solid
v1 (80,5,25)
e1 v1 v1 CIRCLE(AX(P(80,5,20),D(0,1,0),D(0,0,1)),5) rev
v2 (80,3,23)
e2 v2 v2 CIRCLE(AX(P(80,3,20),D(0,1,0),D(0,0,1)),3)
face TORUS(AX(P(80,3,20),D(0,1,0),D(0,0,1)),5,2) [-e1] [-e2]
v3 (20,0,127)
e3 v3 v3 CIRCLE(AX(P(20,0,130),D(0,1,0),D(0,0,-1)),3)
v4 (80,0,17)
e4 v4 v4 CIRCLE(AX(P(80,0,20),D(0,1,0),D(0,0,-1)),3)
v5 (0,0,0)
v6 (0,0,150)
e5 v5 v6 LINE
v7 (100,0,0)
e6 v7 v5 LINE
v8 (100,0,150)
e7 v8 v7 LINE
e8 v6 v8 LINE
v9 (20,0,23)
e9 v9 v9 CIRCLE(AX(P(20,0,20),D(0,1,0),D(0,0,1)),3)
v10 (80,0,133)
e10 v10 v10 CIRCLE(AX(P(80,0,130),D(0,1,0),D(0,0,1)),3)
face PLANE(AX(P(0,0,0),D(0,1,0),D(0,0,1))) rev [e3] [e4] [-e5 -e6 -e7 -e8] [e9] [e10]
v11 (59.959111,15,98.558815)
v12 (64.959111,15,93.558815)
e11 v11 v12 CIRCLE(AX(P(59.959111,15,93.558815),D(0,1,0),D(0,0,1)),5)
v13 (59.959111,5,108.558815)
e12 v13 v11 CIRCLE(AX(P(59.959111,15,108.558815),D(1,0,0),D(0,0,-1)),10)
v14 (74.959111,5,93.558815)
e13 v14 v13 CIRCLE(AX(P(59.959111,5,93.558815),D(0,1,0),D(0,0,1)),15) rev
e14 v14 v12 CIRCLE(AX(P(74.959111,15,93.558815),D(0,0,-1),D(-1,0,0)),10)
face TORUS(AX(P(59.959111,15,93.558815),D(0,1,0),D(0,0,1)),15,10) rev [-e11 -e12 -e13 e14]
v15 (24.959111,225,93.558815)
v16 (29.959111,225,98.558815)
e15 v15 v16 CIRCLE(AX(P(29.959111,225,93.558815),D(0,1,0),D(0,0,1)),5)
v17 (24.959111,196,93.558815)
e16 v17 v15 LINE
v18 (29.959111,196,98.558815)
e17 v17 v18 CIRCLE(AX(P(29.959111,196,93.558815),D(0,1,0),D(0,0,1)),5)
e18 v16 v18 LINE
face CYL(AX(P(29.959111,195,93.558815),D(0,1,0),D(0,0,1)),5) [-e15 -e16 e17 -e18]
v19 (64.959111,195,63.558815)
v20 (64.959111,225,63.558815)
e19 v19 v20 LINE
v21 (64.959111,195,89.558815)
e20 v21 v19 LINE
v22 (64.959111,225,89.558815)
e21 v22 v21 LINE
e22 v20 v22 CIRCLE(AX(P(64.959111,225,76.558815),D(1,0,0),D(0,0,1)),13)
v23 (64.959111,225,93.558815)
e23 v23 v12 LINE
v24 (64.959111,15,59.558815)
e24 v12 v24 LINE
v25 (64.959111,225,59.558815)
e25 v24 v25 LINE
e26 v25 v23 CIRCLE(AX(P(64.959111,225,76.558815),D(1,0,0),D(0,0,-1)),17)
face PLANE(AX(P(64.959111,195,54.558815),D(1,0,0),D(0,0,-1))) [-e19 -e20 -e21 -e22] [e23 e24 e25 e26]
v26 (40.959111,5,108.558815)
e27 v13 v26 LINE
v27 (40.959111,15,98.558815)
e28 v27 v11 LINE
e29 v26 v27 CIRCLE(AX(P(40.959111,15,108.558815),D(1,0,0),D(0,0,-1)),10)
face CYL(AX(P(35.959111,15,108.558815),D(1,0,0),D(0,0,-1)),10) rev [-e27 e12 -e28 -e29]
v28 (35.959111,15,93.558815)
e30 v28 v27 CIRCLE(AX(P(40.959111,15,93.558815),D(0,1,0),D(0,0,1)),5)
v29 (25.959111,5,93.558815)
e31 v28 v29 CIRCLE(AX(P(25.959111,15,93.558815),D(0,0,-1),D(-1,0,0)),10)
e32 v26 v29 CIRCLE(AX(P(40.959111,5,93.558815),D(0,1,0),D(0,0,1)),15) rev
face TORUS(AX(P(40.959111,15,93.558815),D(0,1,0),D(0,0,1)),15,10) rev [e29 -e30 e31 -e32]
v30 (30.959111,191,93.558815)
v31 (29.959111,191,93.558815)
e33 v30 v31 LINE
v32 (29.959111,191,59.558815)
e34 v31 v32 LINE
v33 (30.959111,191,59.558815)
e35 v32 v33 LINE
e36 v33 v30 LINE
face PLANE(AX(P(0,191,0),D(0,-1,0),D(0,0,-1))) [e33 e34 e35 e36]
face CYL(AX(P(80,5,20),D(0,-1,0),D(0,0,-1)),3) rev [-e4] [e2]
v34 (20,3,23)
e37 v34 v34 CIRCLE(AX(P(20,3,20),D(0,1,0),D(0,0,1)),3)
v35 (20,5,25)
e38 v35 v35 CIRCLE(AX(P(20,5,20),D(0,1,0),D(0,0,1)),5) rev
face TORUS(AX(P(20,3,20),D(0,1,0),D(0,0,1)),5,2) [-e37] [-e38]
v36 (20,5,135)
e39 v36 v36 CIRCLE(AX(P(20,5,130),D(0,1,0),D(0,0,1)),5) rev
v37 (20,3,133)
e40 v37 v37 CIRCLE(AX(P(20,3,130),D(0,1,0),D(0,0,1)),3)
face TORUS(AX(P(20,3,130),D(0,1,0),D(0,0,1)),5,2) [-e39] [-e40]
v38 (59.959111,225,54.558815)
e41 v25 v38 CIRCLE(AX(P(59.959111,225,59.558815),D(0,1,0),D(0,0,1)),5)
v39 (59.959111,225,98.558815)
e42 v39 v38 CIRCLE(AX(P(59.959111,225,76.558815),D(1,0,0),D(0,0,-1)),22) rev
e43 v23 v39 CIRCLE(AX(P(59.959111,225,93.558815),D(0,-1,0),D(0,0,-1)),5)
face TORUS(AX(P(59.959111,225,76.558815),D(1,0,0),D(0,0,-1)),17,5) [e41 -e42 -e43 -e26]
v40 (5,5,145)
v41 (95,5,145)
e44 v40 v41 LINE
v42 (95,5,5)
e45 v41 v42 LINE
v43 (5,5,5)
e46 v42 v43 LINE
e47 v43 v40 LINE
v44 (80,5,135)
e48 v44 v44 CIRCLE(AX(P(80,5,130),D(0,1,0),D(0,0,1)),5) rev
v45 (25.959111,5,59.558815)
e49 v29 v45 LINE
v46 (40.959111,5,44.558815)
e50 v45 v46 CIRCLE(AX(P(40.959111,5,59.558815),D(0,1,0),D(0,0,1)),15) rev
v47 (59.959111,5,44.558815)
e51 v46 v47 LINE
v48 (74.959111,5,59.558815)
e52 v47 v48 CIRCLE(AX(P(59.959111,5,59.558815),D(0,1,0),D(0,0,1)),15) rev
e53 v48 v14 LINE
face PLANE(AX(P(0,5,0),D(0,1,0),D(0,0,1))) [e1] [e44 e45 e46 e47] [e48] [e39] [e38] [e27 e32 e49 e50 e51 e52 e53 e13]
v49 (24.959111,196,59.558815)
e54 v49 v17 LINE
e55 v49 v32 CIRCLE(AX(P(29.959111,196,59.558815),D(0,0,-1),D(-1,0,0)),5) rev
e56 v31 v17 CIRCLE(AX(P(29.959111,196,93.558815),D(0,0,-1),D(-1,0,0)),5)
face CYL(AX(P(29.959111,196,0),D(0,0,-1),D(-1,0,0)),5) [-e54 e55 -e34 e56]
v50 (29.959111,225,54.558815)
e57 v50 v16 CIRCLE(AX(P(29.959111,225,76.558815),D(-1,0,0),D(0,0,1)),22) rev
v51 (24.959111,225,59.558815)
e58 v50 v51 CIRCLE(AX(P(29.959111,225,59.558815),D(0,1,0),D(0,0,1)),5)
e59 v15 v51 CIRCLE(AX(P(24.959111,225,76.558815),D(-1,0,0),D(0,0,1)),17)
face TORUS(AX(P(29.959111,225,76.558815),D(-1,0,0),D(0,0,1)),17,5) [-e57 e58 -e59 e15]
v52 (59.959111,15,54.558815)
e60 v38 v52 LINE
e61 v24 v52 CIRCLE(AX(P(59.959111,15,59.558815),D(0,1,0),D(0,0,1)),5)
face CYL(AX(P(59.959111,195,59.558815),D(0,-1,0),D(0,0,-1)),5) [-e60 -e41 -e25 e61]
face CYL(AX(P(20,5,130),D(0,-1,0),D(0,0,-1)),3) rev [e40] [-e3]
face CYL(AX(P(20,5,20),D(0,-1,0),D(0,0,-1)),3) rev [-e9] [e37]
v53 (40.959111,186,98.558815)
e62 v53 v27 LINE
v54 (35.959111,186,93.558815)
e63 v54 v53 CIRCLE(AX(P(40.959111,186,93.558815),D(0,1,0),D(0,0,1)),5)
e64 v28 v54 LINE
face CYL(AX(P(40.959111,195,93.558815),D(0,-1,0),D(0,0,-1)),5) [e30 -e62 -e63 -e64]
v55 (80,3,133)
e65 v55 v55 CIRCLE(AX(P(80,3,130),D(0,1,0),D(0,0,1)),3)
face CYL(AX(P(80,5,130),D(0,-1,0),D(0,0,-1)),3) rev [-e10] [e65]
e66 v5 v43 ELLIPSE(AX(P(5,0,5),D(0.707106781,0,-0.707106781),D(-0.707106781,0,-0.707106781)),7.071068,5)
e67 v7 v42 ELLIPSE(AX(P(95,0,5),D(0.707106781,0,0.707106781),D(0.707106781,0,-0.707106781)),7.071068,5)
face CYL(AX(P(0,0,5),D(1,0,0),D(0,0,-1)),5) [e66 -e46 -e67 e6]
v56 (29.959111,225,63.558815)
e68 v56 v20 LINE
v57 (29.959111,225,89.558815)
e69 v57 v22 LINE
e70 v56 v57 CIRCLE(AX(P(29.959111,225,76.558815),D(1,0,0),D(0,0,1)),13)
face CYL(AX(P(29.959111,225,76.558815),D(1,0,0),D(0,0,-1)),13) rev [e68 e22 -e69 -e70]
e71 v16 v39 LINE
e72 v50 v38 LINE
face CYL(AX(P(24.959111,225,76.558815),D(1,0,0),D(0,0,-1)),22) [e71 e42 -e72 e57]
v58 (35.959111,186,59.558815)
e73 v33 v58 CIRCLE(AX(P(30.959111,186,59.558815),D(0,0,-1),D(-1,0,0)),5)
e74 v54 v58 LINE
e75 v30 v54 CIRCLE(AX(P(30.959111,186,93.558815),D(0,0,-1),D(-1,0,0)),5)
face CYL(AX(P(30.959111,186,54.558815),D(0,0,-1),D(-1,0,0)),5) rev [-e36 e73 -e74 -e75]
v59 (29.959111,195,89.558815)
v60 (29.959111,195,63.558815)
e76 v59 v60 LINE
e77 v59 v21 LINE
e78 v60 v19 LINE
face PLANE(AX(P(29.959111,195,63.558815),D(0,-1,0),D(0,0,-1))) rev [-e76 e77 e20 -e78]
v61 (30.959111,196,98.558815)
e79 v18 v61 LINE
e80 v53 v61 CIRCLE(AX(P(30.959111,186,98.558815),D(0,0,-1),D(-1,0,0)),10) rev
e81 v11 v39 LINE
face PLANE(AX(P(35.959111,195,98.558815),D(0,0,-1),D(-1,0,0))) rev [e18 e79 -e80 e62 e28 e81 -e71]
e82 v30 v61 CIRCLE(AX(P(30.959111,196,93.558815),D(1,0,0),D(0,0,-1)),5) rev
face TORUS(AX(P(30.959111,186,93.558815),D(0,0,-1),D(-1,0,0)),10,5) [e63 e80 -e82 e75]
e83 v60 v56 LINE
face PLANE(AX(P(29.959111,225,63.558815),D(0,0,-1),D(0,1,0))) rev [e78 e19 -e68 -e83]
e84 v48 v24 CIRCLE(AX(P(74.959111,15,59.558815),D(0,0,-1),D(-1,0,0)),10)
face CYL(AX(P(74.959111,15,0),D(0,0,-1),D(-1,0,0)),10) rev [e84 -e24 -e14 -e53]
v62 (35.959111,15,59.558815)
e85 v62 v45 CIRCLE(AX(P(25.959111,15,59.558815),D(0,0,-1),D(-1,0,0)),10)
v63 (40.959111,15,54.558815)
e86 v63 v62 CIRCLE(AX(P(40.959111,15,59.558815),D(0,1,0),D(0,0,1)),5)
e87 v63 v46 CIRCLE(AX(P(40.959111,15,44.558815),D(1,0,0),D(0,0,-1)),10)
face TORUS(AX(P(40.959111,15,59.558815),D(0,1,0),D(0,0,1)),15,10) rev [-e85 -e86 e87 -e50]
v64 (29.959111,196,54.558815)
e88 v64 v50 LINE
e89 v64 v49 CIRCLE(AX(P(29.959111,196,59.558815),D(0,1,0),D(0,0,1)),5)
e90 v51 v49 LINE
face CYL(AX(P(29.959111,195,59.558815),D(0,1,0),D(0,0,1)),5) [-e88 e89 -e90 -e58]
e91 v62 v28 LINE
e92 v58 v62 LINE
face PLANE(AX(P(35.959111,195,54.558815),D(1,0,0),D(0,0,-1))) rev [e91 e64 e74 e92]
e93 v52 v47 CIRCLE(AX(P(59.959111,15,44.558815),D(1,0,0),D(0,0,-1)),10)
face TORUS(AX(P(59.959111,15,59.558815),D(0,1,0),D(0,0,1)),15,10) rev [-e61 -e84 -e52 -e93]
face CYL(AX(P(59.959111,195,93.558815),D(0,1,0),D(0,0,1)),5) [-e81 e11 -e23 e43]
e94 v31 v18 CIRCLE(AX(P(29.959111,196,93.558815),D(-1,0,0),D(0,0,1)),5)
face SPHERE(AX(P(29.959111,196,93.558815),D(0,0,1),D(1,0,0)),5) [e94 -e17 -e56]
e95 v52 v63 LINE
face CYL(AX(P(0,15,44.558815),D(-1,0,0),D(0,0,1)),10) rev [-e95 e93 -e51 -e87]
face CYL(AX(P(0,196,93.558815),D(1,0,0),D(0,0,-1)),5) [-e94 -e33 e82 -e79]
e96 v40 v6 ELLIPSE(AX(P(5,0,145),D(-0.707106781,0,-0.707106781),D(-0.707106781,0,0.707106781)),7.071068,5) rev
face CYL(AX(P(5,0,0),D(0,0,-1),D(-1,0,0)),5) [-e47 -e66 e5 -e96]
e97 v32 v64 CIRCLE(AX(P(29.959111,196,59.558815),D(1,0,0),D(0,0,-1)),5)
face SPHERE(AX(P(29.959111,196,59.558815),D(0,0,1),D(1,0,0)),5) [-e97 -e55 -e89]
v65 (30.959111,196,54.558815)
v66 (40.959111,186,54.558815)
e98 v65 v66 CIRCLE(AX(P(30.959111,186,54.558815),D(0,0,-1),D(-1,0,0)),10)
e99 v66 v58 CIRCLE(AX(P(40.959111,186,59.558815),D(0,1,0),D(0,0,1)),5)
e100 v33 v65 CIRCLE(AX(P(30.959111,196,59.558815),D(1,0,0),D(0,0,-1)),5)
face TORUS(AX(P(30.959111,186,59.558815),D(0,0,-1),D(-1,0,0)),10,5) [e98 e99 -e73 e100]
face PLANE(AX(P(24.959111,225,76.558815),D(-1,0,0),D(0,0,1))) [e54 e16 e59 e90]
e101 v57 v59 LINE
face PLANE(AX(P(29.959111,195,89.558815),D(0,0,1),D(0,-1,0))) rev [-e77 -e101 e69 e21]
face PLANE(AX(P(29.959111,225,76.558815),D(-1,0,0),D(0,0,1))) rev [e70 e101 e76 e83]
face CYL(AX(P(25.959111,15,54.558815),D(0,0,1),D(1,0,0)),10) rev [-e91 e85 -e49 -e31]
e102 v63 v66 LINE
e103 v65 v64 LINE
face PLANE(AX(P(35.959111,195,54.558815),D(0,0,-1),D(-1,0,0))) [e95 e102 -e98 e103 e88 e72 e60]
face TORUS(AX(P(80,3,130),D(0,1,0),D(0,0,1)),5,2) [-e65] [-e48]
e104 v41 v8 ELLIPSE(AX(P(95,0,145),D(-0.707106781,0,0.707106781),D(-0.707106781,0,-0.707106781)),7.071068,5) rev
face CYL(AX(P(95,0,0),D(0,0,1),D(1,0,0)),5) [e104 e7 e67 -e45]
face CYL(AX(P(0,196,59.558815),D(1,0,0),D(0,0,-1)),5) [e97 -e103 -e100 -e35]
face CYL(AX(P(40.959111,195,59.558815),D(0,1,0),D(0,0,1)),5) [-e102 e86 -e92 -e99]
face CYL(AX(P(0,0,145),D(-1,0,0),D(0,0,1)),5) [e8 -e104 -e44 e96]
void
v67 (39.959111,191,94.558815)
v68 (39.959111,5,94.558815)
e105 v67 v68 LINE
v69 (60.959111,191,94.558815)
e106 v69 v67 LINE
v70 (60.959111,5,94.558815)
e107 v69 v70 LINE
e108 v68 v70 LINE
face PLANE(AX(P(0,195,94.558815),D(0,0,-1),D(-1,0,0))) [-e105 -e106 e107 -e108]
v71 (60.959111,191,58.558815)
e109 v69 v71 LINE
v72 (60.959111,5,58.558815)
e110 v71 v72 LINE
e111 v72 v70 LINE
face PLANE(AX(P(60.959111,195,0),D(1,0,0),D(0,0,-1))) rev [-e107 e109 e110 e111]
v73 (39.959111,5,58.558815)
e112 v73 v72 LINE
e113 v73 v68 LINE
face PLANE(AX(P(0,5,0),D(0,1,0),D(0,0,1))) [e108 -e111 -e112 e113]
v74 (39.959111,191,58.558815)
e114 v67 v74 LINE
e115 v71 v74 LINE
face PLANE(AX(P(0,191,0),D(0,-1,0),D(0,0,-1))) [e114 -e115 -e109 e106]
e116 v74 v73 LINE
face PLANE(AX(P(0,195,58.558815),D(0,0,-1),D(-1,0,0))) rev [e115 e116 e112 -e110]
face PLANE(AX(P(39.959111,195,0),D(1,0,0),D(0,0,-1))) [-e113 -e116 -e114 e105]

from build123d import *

# Parameters (mm, degrees)
SKETCH1_W           = 100
SKETCH1_H           = 150
SKETCH1_R           = 3
BOTTOM_DEPTH        = 5
SKETCH2_W           = 29
SKETCH2_H           = 44
SKETCH2_W_2         = 21
SKETCH2_H_2         = 36
BOSS_EXTRUDE2_DEPTH = 190
BOSS_EXTRUDE3_DEPTH = 40
CUT_EXTRUDE1_DEPTH  = 35
SKETCH5_W           = 40
SKETCH5_H           = 44
BOSS_EXTRUDE4_DEPTH = 4
FILLET1_R           = 5
FILLET3_R           = 5
FILLET4_R           = 5
FILLET5_R           = 10
FILLET6_R           = 5
FILLET7_R           = 2


# Some blends are built 0.0001 mm under size
with BuildPart() as part:
    # Sketch1 → bottom (new body)
    with BuildSketch(Plane(origin=(0, 0, 0), x_dir=(1, 0, 0), z_dir=(0, 1, 0))):
        with Locations((50, -75)):
            Rectangle(SKETCH1_W, SKETCH1_H)
        with Locations(Location((20, -20, 0), (0, 0, 270))):
            Circle(SKETCH1_R, mode=Mode.SUBTRACT)
        with Locations(Location((80, -20, 0), (0, 0, 90))):
            Circle(SKETCH1_R, mode=Mode.SUBTRACT)
        with Locations(Location((80, -130, 0), (0, 0, 270))):
            Circle(SKETCH1_R, mode=Mode.SUBTRACT)
        with Locations(Location((20, -130, 0), (0, 0, 90))):
            Circle(SKETCH1_R, mode=Mode.SUBTRACT)
    extrude(amount=BOTTOM_DEPTH)

    # Sketch2 → Boss-Extrude2 (add)
    with BuildSketch(Plane(origin=(0, 5, 0), x_dir=(1, 0, 0), z_dir=(0, 1, 0))):
        with Locations((50.459110832, -76.558815358)):
            Rectangle(SKETCH2_W, SKETCH2_H)
        with Locations((50.459110832, -76.558815358)):
            Rectangle(SKETCH2_W_2, SKETCH2_H_2, mode=Mode.SUBTRACT)
    extrude(amount=BOSS_EXTRUDE2_DEPTH)

    # Sketch3 → Boss-Extrude3 (add)
    with BuildSketch(Plane(origin=(64.959110832, 0, 0), x_dir=(0, 0, -1), z_dir=(1, 0, 0))):
        with BuildLine():
            Line((-98.558815358, 195), (-98.558815358, 225))
            ThreePointArc((-98.558815358, 225), (-76.558815358, 247), (-54.558815358, 225))
            Line((-54.558815358, 225), (-54.558815358, 195))
            Line((-54.558815358, 195), (-98.558815358, 195))
        make_face()
    extrude(amount=-BOSS_EXTRUDE3_DEPTH)

    # Sketch4 → Cut-Extrude1 (cut)
    with BuildSketch(Plane(origin=(64.959110832, 0, 0), x_dir=(0, 0, -1), z_dir=(1, 0, 0))):
        with BuildLine():
            Line((-89.558815358, 195), (-89.558815358, 225))
            ThreePointArc((-89.558815358, 225), (-76.558815358, 238), (-63.558815358, 225))
            Line((-63.558815358, 225), (-63.558815358, 195))
            Line((-63.558815358, 195), (-89.558815358, 195))
        make_face()
    extrude(amount=-CUT_EXTRUDE1_DEPTH, mode=Mode.SUBTRACT)

    # Sketch5 → Boss-Extrude4 (add)
    with BuildSketch(Plane.XZ.offset(-195)):
        with Locations((44.959110832, 76.558815358)):
            Rectangle(SKETCH5_W, SKETCH5_H)
    extrude(amount=BOSS_EXTRUDE4_DEPTH)

    # Fillet1
    fillet1_edges = [part.edges().sort_by_distance(p)[0] for p in [
        (24.959110832, 191, 76.558815358),
        (24.959110832, 208, 98.558815358),
        (24.959110832, 247, 76.558815358),
        (24.959110832, 208, 54.558815358),
    ]]
    fillet(fillet1_edges, radius=FILLET1_R)

    # Fillet3
    # the kernel refuses this fillet: 5 mm, written as the material it adds along each edge
    with BuildSketch(Plane(origin=(35.959110832, 191, 54.558815358), x_dir=(-1, 0, 0), z_dir=(0, 0, 1))) as fillet3_piece_1:
        with BuildLine():
            CenterArc((FILLET3_R, FILLET3_R), FILLET3_R, 180, 90)
            Line((0, FILLET3_R), (0, 0))
            Line((0, 0), (FILLET3_R, 0))
        make_face()
    extrude(amount=44)
    # the kernel refuses this fillet: 5 mm, written as the material it takes off along each edge
    with BuildSketch(Plane(origin=(29.959110832, 196, 59.558815358), x_dir=(0, 0, -1), z_dir=(0, -1, 0))) as fillet3_2_piece_1_section:
        Polygon((0, 0), (FILLET3_R * 1.02, 0), (FILLET3_R * 1.02, -FILLET3_R * 1.02), (0, -FILLET3_R * 1.02), align=None)
    fillet3_2_piece_1 = extrude(amount=FILLET3_R * 1.02, mode=Mode.PRIVATE)
    fillet3_2_piece_1 = fillet3_2_piece_1 - Plane(origin=(29.959110832, 196, 59.558815358), x_dir=(0.7071067811865475, 0, 0.7071067811865475), z_dir=(0, -1, 0)) * Sphere(FILLET3_R, mode=Mode.PRIVATE)
    add(fillet3_2_piece_1, mode=Mode.SUBTRACT)
    with BuildSketch(Plane(origin=(29.959110832, 196, 93.558815358), x_dir=(0, 0, 1), z_dir=(0, -1, 0))) as fillet3_2_piece_2_section:
        Polygon((0, 0), (FILLET3_R * 1.02, 0), (FILLET3_R * 1.02, FILLET3_R * 1.02), (0, FILLET3_R * 1.02), align=None)
    fillet3_2_piece_2 = extrude(amount=FILLET3_R * 1.02, mode=Mode.PRIVATE)
    fillet3_2_piece_2 = fillet3_2_piece_2 - Plane(origin=(29.959110832, 196, 93.558815358), x_dir=(0.7071067811865475, 0, -0.7071067811865475), z_dir=(0, -1, 0)) * Sphere(FILLET3_R, mode=Mode.PRIVATE)
    add(fillet3_2_piece_2, mode=Mode.SUBTRACT)
    with BuildSketch(Plane(origin=(35.959110832, 5, 98.558815358), x_dir=(1, 0, 0), z_dir=(0, 1, 0))) as fillet3_2_piece_3:
        with BuildLine():
            CenterArc((FILLET3_R, FILLET3_R), FILLET3_R, 180, 90)
            Line((0, FILLET3_R), (0, 0))
            Line((0, 0), (FILLET3_R, 0))
        make_face()
    extrude(amount=181, mode=Mode.SUBTRACT)
    with BuildSketch(Plane(origin=(35.959110832, 5, 54.558815358), x_dir=(1, 0, 0), z_dir=(0, 1, 0))) as fillet3_2_piece_4:
        with BuildLine():
            CenterArc((FILLET3_R, -FILLET3_R), FILLET3_R, 90, 90)
            Line((0, -FILLET3_R), (0, 0))
            Line((0, 0), (FILLET3_R, 0))
        make_face()
    extrude(amount=181, mode=Mode.SUBTRACT)
    with BuildSketch(Plane(origin=(29.959110832, 191, 98.558815358), x_dir=(0, 0, -1), z_dir=(1, 0, 0)), Plane(origin=(30.959110832, 191, 54.558815358), x_dir=(0, 0, 1), z_dir=(-1, 0, 0))) as fillet3_2_piece_5:
        with BuildLine():
            CenterArc((FILLET3_R, FILLET3_R), FILLET3_R, 180, 90)
            Line((0, FILLET3_R), (0, 0))
            Line((0, 0), (FILLET3_R, 0))
        make_face()
    extrude(amount=1, mode=Mode.SUBTRACT)
    with BuildSketch(Plane(origin=(30.959110832, 186, 54.558815358), x_dir=(0, 1, 0), z_dir=(-1, 0, 0))) as fillet3_2_piece_6:
        with BuildLine():
            CenterArc((5 + FILLET3_R, -FILLET3_R), FILLET3_R, 90, 90)
            Line((5 + FILLET3_R, 0), (5, 0))
            Line((5, 0), (5, -FILLET3_R))
        make_face()
    revolve(axis=Axis((30.959110832, 186, 54.558815358), (0, 0, -1)), revolution_arc=90, mode=Mode.SUBTRACT)
    with BuildSketch(Plane(origin=(30.959110832, 186, 98.558815358), x_dir=(0, 1, 0), z_dir=(-1, 0, 0))) as fillet3_2_piece_7:
        with BuildLine():
            CenterArc((5 + FILLET3_R, FILLET3_R), FILLET3_R, 180, 90)
            Line((5 + FILLET3_R, 0), (5, 0))
            Line((5, 0), (5, FILLET3_R))
        make_face()
    revolve(axis=Axis((30.959110832, 186, 98.558815358), (0, 0, -1)), revolution_arc=90, mode=Mode.SUBTRACT)

    # Fillet4
    fillet4_edges = [part.edges().sort_by_distance(p)[0] for p in [
        (64.959110832, 115, 54.558815358),
        (64.959110832, 115, 98.558815358),
        (64.959110832, 247, 76.558815358),
    ]]
    fillet(fillet4_edges, radius=FILLET4_R)

    # Fillet5
    fillet5_edges = [part.edges().sort_by_distance(p)[0] for p in [
        (50.459110832, 5, 98.558815358),
        (50.459110832, 5, 54.558815358),
        (35.959110832, 5, 76.558815358),
        (37.423576926, 5, 56.023281452),
        (37.423576926, 5, 97.094349264),
        (64.959110832, 5, 76.558815358),
        (63.494644738, 5, 97.094349264),
        (63.494644738, 5, 56.023281452),
    ]]
    fillet(fillet5_edges, radius=FILLET5_R)

    # Fillet6
    fillet6_edges = [part.edges().sort_by_distance(p)[0] for p in [
        (100, 5, 75),
        (50, 5, 0),
        (0, 5, 75),
        (50, 5, 150),
    ]]
    fillet(fillet6_edges, radius=FILLET6_R - 0.0001)  # a hair under: the kernel refuses the full size

    # Fillet7
    fillet7_edges = [part.edges().sort_by_distance(p)[0] for p in [
        (20, 5, 17),
        (80, 5, 23),
        (80, 5, 127),
        (20, 5, 133),
    ]]
    fillet(fillet7_edges, radius=FILLET7_R)


solid = part.part
